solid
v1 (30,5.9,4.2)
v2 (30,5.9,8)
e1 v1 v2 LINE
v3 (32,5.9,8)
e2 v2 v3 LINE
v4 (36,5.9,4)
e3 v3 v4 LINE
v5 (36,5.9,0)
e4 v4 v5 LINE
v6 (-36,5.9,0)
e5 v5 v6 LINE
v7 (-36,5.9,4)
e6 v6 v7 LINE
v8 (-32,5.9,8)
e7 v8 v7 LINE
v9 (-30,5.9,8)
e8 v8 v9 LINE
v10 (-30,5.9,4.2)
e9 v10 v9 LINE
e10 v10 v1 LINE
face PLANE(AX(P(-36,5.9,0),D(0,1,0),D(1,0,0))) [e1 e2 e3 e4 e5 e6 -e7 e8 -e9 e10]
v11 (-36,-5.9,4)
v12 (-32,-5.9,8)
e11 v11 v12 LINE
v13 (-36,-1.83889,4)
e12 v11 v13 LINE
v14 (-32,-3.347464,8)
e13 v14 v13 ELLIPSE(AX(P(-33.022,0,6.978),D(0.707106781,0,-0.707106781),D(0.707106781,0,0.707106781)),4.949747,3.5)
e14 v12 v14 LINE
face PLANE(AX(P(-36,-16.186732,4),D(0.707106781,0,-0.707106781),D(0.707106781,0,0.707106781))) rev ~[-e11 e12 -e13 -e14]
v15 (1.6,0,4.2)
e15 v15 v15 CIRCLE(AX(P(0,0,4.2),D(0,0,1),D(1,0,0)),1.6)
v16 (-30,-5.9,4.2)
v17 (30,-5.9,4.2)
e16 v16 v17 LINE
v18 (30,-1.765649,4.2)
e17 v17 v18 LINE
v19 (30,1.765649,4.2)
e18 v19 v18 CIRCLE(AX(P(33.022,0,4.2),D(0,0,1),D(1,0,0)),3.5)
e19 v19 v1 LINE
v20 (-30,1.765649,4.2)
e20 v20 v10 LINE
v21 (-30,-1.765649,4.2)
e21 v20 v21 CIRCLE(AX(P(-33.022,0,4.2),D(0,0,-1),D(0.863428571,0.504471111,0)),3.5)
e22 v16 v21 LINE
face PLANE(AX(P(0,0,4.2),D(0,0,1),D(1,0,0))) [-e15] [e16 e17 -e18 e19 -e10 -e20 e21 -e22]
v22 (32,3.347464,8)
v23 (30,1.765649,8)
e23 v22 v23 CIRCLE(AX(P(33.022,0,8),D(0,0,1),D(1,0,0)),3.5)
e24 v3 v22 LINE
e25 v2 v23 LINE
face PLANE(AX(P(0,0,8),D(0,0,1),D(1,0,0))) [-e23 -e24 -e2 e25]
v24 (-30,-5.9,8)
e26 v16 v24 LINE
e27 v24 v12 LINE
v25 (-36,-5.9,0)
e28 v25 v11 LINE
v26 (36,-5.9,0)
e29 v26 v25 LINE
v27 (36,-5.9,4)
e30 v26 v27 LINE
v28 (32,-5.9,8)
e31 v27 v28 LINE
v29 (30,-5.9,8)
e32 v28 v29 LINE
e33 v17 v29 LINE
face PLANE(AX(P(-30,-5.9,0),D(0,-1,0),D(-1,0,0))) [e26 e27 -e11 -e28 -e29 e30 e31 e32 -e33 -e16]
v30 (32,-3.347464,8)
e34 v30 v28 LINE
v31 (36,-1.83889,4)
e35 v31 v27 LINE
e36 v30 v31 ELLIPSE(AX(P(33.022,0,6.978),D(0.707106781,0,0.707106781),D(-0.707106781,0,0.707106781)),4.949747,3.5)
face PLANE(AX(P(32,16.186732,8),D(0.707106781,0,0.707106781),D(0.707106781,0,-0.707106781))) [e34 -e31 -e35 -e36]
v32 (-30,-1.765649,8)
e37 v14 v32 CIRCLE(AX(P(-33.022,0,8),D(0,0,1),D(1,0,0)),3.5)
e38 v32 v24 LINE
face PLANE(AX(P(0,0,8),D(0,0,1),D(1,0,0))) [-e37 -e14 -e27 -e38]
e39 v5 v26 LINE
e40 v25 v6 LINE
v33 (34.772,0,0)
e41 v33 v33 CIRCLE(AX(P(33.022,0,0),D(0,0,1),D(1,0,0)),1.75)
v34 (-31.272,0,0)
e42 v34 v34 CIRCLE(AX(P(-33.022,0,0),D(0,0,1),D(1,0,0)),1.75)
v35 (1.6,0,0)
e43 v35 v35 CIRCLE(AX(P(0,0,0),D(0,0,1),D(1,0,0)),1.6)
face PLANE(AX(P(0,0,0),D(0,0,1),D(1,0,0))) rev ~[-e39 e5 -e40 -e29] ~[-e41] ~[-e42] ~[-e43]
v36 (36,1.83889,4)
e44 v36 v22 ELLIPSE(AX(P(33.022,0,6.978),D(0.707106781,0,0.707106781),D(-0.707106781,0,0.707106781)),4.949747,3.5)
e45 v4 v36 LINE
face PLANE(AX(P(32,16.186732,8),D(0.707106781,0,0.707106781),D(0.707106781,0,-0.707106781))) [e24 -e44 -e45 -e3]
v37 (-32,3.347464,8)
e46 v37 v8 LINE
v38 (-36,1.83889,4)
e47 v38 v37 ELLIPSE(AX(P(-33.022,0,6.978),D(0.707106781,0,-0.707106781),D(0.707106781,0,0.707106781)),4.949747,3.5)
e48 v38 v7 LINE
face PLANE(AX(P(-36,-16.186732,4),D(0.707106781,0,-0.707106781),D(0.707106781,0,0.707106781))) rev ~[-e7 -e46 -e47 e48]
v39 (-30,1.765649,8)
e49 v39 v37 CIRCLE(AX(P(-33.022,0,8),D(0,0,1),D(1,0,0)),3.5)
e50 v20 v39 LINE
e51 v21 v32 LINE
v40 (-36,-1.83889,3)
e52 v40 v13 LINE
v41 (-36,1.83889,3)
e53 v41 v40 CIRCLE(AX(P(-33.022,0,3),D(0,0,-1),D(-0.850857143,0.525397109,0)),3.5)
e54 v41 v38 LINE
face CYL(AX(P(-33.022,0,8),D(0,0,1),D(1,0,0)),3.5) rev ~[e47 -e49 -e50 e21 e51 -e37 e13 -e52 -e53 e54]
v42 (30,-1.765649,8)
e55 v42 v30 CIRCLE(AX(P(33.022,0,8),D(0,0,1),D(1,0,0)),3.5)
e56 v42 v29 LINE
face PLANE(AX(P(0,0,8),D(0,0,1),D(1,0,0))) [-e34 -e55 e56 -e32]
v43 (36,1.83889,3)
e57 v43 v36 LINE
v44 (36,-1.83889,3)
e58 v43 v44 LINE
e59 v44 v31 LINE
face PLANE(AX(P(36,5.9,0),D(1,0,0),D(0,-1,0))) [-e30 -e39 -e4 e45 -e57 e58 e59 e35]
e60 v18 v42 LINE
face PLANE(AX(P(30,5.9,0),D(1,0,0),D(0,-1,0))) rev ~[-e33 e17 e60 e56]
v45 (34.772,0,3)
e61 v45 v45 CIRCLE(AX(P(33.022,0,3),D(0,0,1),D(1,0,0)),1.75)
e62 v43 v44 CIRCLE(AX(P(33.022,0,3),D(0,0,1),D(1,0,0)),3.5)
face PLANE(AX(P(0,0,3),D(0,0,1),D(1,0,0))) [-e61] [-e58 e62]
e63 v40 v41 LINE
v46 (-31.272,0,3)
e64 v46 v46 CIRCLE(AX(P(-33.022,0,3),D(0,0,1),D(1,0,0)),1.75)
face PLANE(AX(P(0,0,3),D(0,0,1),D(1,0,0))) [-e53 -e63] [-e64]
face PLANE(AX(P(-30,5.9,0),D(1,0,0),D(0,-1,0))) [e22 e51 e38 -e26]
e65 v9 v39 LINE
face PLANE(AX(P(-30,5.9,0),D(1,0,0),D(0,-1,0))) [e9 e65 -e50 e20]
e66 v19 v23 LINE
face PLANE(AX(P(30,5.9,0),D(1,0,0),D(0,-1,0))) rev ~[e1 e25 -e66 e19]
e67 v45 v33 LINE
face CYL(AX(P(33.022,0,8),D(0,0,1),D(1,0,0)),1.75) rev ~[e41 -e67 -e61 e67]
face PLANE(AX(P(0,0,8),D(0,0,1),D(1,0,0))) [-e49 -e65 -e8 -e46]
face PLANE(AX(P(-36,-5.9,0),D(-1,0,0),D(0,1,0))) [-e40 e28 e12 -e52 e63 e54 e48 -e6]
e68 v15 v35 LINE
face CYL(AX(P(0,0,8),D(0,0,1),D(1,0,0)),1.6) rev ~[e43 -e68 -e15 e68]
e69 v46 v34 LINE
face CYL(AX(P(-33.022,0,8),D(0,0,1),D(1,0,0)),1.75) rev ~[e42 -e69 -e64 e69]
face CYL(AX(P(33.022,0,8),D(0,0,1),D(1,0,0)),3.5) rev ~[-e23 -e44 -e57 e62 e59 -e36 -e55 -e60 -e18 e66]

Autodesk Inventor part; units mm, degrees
ref_plane "YZ Plane" through (0, 0, 0) normal (1, 0, 0) x (0, 1, 0)
ref_plane "XZ Plane" through (0, 0, 0) normal (0, 1, 0) x (-1, 0, 0)
ref_plane "XY Plane" through (0, 0, 0) normal (0, 0, 1) x (1, 0, 0)
sketch "Sketch1" plane through (0, 0, 0) normal (0, 0, 1) x (1, 0, 0)
  line L0 (-36, 5.9) -> (36, 5.9)
  line L1 (36, 5.9) -> (36, -5.9)
  line L2 (36, -5.9) -> (-36, -5.9)
  line L3 (-36, -5.9) -> (-36, 5.9)
  line L4 (-30, 5.9) -> (-30, -5.9)
  line L5 (30, 5.9) -> (30, -5.9)
  point P0 (0, 0)
  point P1 (0, 5.9)
  point P2 (-36, 0)
  dimension "d0" = 11.8
  dimension "d1" = 72
  dimension "d2" = 6
  dimension "d3" = 6
extrude "Extrusion1" add sketch "Sketch1" along normal blind 4.2
extrude "Extrusion2" add sketch "Sketch1" along normal blind 8 contours L0 L4 L2 L3 | L0 L1 L2 L5
sketch "Sketch2" plane through (0, 0, 8) normal (0, 0, 1) x (1, 0, 0)
  circle A0 centre (-33.022, 0) radius 3.5
  circle A1 centre (-33.022, 0) radius 1.75
  circle A2 centre (0, 0) radius 1.6
  line L0 (0, 3.25) -> (0, 0) construction
  circle A3 centre (33.022, 0) radius 3.5
  circle A4 centre (33.022, 0) radius 1.75
  dimension "d9" = 7
  dimension "d10" = 33.022
  dimension "d11" = 3.5
  dimension "d12" = 3.2
extrude "Extrusion3" cut sketch "Sketch2" against normal up to surface (8 mm away) contours A1 | A2 | A4
chamfer "Chamfer1" distance 4 angle 45 2 edges at (-36, 0, 8) (36, 0, 8)
extrude "Extrusion4" cut sketch "Sketch2" against normal blind 5 contours A0 | A3
properties part number "GA_FixaBase"
